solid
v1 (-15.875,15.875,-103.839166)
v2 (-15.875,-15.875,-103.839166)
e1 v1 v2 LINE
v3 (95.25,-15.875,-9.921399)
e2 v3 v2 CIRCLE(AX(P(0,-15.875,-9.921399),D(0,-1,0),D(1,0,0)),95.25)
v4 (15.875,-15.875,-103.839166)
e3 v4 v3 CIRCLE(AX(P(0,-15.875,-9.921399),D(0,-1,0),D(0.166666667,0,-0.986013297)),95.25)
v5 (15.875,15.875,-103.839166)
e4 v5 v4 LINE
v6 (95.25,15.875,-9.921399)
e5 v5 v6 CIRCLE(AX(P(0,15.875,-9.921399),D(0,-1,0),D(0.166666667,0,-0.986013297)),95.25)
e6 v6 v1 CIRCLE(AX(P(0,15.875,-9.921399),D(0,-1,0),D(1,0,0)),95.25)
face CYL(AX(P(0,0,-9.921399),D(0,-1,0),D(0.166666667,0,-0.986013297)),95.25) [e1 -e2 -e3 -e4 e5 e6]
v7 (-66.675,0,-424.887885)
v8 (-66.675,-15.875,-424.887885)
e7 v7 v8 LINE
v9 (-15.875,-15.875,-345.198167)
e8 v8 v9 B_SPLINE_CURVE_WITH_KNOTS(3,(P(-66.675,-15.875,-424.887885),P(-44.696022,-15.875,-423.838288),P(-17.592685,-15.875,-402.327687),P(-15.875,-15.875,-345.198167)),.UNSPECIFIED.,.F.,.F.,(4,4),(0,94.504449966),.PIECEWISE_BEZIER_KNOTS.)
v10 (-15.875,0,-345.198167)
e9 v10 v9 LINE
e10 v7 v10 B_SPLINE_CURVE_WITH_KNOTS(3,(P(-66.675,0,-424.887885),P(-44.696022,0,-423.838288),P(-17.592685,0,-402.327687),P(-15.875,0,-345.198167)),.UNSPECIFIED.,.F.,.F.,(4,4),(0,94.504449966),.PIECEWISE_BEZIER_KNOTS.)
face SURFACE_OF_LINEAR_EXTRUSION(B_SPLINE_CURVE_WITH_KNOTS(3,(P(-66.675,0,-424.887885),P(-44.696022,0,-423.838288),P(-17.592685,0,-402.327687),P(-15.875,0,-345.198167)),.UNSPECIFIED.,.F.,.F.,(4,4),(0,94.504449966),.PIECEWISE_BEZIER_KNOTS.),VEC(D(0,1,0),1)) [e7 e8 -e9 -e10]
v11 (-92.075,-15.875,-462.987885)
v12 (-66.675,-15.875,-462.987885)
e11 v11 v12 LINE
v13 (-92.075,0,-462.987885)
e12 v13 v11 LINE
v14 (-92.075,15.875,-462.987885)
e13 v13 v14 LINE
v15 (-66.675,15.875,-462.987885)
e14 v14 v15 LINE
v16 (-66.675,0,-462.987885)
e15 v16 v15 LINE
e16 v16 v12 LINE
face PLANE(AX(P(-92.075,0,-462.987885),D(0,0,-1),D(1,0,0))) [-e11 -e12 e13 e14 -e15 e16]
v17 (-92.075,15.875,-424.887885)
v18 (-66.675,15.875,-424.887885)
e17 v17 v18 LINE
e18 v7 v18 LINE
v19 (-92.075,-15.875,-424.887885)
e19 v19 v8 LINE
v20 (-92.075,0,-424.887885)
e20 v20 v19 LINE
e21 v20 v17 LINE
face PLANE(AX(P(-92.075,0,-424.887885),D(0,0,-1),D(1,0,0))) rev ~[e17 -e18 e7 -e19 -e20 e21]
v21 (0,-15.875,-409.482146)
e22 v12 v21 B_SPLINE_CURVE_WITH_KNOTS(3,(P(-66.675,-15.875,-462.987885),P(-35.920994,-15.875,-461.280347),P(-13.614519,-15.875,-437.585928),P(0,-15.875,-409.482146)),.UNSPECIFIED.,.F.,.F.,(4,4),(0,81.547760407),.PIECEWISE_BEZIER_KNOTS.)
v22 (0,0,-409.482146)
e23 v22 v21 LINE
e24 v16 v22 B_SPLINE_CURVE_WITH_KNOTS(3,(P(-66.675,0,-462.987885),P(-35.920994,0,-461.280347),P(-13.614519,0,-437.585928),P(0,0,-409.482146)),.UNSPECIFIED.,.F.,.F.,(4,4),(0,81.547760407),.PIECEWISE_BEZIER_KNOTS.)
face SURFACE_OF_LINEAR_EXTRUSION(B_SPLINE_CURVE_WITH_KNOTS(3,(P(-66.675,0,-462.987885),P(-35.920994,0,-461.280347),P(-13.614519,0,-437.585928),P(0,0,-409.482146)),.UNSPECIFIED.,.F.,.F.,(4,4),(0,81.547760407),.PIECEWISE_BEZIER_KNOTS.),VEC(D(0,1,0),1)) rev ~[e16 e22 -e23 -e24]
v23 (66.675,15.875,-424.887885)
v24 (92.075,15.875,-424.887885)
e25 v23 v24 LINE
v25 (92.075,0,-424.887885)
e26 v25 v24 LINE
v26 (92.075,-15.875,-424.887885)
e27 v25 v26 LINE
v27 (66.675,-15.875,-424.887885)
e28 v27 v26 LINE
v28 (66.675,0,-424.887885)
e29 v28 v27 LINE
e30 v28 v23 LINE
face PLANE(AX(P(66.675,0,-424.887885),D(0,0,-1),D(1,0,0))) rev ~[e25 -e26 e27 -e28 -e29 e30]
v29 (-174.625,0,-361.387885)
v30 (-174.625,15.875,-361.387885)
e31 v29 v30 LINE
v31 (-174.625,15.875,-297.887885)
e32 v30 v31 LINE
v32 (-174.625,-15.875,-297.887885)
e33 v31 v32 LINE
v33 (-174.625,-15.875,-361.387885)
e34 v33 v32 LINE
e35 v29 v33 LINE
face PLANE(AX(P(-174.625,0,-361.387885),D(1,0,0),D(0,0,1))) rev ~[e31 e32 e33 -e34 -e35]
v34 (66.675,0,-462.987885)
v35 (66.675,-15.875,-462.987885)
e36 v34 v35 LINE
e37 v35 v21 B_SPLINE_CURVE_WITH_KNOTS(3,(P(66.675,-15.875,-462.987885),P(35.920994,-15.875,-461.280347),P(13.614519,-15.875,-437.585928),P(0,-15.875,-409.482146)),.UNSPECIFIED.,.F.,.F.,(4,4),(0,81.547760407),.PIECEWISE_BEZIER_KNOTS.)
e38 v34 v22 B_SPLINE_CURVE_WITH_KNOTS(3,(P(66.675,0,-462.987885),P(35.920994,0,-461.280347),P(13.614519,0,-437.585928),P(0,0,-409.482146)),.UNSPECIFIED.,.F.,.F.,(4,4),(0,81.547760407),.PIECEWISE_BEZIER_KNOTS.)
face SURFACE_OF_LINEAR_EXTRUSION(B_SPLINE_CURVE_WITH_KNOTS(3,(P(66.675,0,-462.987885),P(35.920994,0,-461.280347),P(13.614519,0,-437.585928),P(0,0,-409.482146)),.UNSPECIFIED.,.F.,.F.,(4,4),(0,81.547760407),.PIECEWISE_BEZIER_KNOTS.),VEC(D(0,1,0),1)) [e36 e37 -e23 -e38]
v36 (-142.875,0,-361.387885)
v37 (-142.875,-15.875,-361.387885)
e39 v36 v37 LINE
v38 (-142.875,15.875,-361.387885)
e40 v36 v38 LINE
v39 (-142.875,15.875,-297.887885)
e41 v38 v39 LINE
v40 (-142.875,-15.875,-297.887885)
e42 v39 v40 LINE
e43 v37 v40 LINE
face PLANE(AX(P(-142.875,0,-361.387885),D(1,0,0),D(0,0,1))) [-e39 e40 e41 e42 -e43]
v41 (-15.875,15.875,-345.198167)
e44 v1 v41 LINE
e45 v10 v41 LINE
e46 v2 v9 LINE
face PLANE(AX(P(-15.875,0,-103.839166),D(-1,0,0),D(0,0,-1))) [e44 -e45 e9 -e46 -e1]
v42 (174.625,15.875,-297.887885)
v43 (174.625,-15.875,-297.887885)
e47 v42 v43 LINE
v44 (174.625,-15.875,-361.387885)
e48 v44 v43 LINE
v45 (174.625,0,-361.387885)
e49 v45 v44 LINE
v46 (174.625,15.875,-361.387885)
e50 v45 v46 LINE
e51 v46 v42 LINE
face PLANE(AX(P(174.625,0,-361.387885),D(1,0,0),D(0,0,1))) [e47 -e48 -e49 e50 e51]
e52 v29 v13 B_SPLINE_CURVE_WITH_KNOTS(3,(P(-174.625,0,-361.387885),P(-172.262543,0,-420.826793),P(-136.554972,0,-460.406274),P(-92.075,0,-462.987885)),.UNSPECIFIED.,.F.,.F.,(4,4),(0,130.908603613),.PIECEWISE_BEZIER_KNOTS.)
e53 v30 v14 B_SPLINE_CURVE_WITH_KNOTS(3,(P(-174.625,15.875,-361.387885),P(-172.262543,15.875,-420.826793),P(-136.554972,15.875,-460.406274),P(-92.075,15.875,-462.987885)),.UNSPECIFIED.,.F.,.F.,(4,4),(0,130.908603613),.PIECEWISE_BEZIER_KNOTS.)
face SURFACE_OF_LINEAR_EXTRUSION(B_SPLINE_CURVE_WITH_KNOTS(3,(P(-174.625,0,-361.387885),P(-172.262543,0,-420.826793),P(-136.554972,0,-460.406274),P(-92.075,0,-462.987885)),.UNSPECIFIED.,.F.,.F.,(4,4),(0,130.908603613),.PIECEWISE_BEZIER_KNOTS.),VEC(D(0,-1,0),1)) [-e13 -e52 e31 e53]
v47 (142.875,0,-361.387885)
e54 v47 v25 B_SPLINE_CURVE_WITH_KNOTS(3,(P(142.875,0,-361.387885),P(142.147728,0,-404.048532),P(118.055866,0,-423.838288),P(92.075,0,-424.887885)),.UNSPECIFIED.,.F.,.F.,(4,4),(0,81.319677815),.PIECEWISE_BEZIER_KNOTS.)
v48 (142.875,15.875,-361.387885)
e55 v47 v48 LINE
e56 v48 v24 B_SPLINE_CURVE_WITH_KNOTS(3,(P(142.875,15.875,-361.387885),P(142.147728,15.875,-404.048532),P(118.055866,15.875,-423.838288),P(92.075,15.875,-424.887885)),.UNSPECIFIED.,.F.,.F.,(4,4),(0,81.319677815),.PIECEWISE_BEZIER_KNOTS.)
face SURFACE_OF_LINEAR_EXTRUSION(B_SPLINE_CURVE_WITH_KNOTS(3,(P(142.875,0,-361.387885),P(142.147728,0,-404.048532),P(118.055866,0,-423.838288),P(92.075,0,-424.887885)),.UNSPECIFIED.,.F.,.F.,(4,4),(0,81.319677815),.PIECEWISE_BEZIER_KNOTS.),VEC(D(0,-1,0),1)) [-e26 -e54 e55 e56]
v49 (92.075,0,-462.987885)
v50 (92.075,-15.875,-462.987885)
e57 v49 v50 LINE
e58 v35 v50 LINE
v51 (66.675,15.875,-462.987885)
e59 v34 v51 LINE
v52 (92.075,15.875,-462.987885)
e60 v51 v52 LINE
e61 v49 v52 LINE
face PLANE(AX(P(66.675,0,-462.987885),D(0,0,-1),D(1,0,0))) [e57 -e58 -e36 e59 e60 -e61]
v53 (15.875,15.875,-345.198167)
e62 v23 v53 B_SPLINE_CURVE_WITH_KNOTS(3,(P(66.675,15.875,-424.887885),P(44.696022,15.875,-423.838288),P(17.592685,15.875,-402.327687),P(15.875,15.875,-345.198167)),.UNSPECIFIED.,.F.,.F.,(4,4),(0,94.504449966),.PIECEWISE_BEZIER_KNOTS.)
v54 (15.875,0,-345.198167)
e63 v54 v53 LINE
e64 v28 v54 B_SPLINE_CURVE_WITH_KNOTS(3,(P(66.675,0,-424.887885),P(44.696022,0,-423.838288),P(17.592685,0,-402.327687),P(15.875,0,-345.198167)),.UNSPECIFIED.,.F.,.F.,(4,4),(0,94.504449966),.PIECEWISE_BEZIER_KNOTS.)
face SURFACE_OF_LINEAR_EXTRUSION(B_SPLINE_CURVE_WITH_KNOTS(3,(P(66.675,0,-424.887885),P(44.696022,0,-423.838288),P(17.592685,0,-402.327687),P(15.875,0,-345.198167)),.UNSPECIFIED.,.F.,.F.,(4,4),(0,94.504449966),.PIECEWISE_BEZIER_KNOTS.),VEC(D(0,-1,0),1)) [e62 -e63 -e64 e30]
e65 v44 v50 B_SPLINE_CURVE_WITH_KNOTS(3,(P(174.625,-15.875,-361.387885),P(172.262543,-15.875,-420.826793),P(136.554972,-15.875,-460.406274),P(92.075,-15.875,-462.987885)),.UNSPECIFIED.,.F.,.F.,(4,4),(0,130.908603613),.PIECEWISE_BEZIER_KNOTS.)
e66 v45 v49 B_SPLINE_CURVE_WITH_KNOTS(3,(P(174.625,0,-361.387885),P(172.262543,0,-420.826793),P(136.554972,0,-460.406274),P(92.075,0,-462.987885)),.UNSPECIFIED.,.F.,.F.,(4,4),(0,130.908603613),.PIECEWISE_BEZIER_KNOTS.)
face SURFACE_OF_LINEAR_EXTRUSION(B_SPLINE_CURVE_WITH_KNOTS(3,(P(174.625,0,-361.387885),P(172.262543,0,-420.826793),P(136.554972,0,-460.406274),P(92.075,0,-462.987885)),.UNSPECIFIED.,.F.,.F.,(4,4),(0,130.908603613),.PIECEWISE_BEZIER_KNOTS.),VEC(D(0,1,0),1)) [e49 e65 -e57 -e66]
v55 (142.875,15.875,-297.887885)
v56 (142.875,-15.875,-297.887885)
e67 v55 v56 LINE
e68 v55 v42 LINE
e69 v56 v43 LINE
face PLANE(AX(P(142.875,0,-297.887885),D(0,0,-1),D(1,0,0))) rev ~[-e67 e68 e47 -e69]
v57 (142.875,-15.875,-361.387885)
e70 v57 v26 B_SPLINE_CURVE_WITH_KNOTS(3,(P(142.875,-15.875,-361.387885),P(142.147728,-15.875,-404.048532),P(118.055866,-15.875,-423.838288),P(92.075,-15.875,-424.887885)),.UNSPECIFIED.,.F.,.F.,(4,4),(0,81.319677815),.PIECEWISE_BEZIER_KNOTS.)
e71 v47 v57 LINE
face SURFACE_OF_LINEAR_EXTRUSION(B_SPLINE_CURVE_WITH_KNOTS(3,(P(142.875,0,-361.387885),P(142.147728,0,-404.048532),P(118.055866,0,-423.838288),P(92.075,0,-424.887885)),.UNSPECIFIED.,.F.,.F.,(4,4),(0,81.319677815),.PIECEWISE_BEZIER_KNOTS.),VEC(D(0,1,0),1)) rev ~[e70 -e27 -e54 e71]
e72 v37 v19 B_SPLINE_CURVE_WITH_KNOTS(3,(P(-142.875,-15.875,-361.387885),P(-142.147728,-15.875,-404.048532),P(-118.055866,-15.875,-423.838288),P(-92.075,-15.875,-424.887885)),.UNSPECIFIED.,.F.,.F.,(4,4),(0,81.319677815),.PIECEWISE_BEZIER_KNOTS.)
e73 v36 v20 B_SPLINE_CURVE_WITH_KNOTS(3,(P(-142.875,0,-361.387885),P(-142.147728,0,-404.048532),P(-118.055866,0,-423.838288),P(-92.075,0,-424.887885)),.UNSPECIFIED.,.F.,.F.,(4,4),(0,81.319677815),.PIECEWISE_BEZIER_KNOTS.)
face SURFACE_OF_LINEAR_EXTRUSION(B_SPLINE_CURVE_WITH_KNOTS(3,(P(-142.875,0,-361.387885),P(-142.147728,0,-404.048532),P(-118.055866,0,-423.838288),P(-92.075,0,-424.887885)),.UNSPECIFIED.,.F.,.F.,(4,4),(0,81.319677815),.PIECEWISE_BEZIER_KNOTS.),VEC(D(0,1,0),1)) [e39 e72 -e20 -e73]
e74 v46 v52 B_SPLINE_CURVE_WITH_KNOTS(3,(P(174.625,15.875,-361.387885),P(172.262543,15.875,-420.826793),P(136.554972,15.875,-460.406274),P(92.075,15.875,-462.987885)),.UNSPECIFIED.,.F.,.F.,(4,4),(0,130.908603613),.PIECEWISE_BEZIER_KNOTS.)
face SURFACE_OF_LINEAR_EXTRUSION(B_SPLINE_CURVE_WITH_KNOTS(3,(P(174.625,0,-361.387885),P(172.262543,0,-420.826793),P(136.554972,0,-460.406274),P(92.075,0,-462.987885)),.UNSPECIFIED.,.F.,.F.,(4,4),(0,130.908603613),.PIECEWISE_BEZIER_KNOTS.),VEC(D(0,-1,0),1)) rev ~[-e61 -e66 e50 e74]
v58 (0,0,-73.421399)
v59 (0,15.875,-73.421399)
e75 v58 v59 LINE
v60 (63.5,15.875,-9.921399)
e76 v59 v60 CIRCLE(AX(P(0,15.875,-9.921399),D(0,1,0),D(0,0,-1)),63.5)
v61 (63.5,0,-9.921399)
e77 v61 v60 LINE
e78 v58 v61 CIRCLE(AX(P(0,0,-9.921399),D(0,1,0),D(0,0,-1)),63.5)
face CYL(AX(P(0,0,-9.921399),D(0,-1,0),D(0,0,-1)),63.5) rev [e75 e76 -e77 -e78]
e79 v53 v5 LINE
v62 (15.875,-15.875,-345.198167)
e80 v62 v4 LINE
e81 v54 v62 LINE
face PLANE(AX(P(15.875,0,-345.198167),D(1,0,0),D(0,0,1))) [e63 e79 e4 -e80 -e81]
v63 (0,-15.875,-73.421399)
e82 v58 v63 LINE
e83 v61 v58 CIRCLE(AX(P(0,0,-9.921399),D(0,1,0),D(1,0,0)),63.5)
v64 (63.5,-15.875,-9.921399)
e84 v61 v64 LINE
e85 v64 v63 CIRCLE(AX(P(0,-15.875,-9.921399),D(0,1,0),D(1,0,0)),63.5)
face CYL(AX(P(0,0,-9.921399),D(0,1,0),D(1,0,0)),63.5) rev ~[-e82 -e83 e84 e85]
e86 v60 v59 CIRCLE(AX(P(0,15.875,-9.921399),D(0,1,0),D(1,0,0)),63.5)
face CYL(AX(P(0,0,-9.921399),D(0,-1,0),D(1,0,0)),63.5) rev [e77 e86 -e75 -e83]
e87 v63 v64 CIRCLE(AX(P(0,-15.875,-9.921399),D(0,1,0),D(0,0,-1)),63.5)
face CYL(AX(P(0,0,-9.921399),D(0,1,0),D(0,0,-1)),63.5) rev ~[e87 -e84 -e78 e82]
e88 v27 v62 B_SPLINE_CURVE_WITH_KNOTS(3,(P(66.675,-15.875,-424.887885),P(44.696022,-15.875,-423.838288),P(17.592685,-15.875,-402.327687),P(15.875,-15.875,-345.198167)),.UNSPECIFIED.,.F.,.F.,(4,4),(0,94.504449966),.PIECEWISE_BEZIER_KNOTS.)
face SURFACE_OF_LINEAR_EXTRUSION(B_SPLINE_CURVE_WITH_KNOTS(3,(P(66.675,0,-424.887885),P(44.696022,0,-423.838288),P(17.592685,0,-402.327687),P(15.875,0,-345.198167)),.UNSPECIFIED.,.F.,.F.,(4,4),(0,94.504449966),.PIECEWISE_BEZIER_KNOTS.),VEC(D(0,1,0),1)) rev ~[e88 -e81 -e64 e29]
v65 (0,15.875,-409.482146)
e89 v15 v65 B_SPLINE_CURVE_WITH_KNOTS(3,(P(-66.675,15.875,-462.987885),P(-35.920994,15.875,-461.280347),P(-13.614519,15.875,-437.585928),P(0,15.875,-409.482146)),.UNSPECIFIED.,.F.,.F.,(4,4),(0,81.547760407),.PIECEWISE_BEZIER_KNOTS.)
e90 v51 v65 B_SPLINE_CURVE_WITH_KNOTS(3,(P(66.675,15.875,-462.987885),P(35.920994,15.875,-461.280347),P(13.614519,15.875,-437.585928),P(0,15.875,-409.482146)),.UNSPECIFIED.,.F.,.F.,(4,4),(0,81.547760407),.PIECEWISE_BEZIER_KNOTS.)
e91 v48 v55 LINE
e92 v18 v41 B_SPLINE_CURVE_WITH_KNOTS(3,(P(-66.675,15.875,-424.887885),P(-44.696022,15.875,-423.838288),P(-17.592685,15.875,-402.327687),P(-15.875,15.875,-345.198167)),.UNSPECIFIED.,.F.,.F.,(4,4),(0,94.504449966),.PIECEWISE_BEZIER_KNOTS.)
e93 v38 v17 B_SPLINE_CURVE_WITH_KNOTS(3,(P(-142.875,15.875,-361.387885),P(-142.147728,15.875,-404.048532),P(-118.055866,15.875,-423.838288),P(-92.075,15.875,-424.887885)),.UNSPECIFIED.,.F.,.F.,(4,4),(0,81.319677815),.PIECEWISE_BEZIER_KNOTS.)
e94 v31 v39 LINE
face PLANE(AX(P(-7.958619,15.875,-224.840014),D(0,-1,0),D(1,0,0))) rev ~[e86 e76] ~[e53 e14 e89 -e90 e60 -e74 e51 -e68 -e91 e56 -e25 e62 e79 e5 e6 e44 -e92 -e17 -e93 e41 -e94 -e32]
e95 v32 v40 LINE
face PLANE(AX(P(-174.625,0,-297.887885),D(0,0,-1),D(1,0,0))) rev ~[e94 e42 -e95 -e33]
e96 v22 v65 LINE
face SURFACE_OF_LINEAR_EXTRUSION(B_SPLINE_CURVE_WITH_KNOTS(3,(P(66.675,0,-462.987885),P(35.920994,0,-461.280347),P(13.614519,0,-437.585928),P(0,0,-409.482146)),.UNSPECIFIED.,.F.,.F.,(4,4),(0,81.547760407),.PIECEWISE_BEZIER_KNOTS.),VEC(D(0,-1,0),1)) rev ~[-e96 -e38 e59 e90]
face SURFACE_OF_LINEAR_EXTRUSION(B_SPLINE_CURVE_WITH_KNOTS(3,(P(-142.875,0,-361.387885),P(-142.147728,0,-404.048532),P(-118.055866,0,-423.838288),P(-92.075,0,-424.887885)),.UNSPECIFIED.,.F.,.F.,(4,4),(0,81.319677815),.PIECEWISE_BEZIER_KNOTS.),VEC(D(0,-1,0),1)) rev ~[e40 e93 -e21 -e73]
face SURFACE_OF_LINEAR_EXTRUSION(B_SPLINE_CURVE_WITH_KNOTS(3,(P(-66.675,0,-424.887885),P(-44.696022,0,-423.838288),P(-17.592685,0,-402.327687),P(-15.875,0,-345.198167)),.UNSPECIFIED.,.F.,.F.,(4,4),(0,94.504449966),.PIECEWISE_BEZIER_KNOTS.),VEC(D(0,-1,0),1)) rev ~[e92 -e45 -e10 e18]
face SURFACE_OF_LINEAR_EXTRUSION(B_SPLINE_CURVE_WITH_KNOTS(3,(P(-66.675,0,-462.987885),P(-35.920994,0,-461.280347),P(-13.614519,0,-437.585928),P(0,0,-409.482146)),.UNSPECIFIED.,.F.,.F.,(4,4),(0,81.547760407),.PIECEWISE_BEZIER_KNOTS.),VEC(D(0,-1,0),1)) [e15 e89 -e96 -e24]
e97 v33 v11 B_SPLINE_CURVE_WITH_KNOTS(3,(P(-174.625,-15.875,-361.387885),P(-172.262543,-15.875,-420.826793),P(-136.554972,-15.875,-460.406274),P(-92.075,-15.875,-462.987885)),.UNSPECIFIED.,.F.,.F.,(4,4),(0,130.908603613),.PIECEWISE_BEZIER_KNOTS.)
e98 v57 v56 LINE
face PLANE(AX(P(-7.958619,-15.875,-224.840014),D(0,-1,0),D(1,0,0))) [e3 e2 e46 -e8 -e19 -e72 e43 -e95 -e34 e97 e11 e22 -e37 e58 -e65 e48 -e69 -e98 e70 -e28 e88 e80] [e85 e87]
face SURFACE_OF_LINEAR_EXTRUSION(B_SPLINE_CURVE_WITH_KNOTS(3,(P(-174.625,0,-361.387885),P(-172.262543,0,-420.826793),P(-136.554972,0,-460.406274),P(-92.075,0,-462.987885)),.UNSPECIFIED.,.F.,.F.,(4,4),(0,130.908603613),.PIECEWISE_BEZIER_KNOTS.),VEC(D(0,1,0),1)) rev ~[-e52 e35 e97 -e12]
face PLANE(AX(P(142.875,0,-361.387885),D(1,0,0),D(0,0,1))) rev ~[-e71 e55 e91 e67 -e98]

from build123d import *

# Parameters (mm, degrees)
F0_W     = 25.4
F0_H     = 38.1
F0_W_2   = 31.75
F0_H_2   = 63.5
F1_DEPTH = 15.875


with BuildPart() as f1:
    # F0 (on Front) → F1 (new body, symmetric)
    with BuildSketch(Plane.XZ):
        with BuildLine():
            Line((-15.875, -103.8391655019), (-15.875, -345.1981674205))
            Line((-15.875, -345.1981674205), (0, -345.1981674205))
            Line((0, -345.1981674205), (0, -105.1713989452))
            ThreePointArc((0, -105.1713989452), (-7.9654012916, -104.8377562407), (-15.875, -103.8391655019))
        make_face()
        with BuildLine():
            add(Edge.make_bspline(
                [(0, -409.482145582), (-10.3991862171, -388.0156164118), (-15.7271620535, -363.9765002128), (-15.875, -345.1981674205)],
                knots=[81.5477604067, 81.5477604067, 81.5477604067, 81.5477604067, 143.8364349915, 143.8364349915, 143.8364349915, 143.8364349915], degree=3))
            add(Edge.make_bspline(
                [(-66.675, -424.8878848455), (-44.6960218251, -423.8382875919), (-17.5926852971, -402.3276865482), (-15.875, -345.1981674205)],
                knots=[0, 0, 0, 0, 94.5044499655, 94.5044499655, 94.5044499655, 94.5044499655], degree=3))
            Line((-66.675, -424.8878848455), (-66.675, -462.9878848455))
            add(Edge.make_bspline(
                [(-66.675, -462.9878848455), (-35.9209941881, -461.2803468487), (-13.6145190391, -437.5859283193), (0, -409.482145582)],
                knots=[0, 0, 0, 0, 81.5477604067, 81.5477604067, 81.5477604067, 81.5477604067], degree=3))
        make_face()
        with BuildLine():
            Line((0, -345.1981674205), (-15.875, -345.1981674205))
            add(Edge.make_bspline(
                [(0, -409.482145582), (-10.3991862171, -388.0156164118), (-15.7271620535, -363.9765002128), (-15.875, -345.1981674205)],
                knots=[81.5477604067, 81.5477604067, 81.5477604067, 81.5477604067, 143.8364349915, 143.8364349915, 143.8364349915, 143.8364349915], degree=3))
            add(Edge.make_bspline(
                [(0, -409.482145582), (10.3991862171, -388.0156164118), (15.7271620535, -363.9765002128), (15.875, -345.1981674205)],
                knots=[81.5477604067, 81.5477604067, 81.5477604067, 81.5477604067, 143.8364349915, 143.8364349915, 143.8364349915, 143.8364349915], degree=3))
            Line((15.875, -345.1981674205), (0, -345.1981674205))
        make_face()
        with BuildLine():
            Line((0, -105.1713989452), (0, -345.1981674205))
            Line((0, -345.1981674205), (15.875, -345.1981674205))
            Line((15.875, -345.1981674205), (15.875, -103.8391655019))
            ThreePointArc((15.875, -103.8391655019), (7.9654012916, -104.8377562407), (0, -105.1713989452))
        make_face()
        with BuildLine():
            ThreePointArc((95.25, -9.9213989452), (-61.483610621, 62.8269902123), (-15.875, -103.8391655019))
            Line((-15.875, -103.8391655019), (-15.875, -91.1981674205))
            Line((-15.875, -91.1981674205), (0, -91.1981674205))
            Line((0, -91.1981674205), (15.875, -91.1981674205))
            Line((15.875, -91.1981674205), (15.875, -103.8391655019))
            ThreePointArc((15.875, -103.8391655019), (72.7483891574, -71.4050095662), (95.25, -9.9213989452))
        make_face()
        with BuildLine():
            ThreePointArc((63.5, -9.9213989452), (44.9012806053, -54.8226795505), (0, -73.4213989452))
            ThreePointArc((0, -73.4213989452), (-44.9012806053, 34.9798816602), (63.5, -9.9213989452))
        make_face(mode=Mode.SUBTRACT)
        with BuildLine():
            Line((-15.875, -91.1981674205), (-15.875, -103.8391655019))
            ThreePointArc((-15.875, -103.8391655019), (-7.9654012916, -104.8377562407), (0, -105.1713989452))
            Line((0, -105.1713989452), (0, -91.1981674205))
            Line((0, -91.1981674205), (-15.875, -91.1981674205))
        make_face()
        with Locations((-79.375, -443.9378848455)):
            Rectangle(F0_W, F0_H)
        with BuildLine():
            add(Edge.make_bspline(
                [(0, -409.482145582), (10.3991862171, -388.0156164118), (15.7271620535, -363.9765002128), (15.875, -345.1981674205)],
                knots=[81.5477604067, 81.5477604067, 81.5477604067, 81.5477604067, 143.8364349915, 143.8364349915, 143.8364349915, 143.8364349915], degree=3))
            add(Edge.make_bspline(
                [(66.675, -462.9878848455), (35.9209941881, -461.2803468487), (13.6145190391, -437.5859283193), (0, -409.482145582)],
                knots=[0, 0, 0, 0, 81.5477604067, 81.5477604067, 81.5477604067, 81.5477604067], degree=3))
            Line((66.675, -462.9878848455), (66.675, -424.8878848455))
            add(Edge.make_bspline(
                [(66.675, -424.8878848455), (44.6960218251, -423.8382875919), (17.5926852971, -402.3276865482), (15.875, -345.1981674205)],
                knots=[0, 0, 0, 0, 94.5044499655, 94.5044499655, 94.5044499655, 94.5044499655], degree=3))
        make_face()
        with BuildLine():
            Line((0, -91.1981674205), (0, -105.1713989452))
            ThreePointArc((0, -105.1713989452), (7.9654012916, -104.8377562407), (15.875, -103.8391655019))
            Line((15.875, -103.8391655019), (15.875, -91.1981674205))
            Line((15.875, -91.1981674205), (0, -91.1981674205))
        make_face()
        with BuildLine():
            Line((-92.075, -462.9878848455), (-92.075, -424.8878848455))
            add(Edge.make_bspline(
                [(-142.875, -361.3878848455), (-142.1477283955, -404.0485322475), (-118.0558662534, -423.8382875919), (-92.075, -424.8878848455)],
                knots=[0, 0, 0, 0, 81.3196778154, 81.3196778154, 81.3196778154, 81.3196778154], degree=3))
            Line((-142.875, -361.3878848455), (-174.625, -361.3878848455))
            add(Edge.make_bspline(
                [(-174.625, -361.3878848455), (-172.2625430346, -420.826792717), (-136.5549724221, -460.4062736034), (-92.075, -462.9878848455)],
                knots=[0, 0, 0, 0, 130.9086036134, 130.9086036134, 130.9086036134, 130.9086036134], degree=3))
        make_face()
        with Locations((79.375, -443.9378848455)):
            Rectangle(F0_W, F0_H)
        with Locations((-158.75, -329.6378848455)):
            Rectangle(F0_W_2, F0_H_2)
        with BuildLine():
            Line((92.075, -424.8878848455), (92.075, -462.9878848455))
            add(Edge.make_bspline(
                [(174.625, -361.3878848455), (172.2625430346, -420.826792717), (136.5549724221, -460.4062736034), (92.075, -462.9878848455)],
                knots=[0, 0, 0, 0, 130.9086036134, 130.9086036134, 130.9086036134, 130.9086036134], degree=3))
            Line((174.625, -361.3878848455), (142.875, -361.3878848455))
            add(Edge.make_bspline(
                [(142.875, -361.3878848455), (142.1477283955, -404.0485322475), (118.0558662534, -423.8382875919), (92.075, -424.8878848455)],
                knots=[0, 0, 0, 0, 81.3196778154, 81.3196778154, 81.3196778154, 81.3196778154], degree=3))
        make_face()
        with Locations((158.75, -329.6378848455)):
            Rectangle(F0_W_2, F0_H_2)
    extrude(amount=F1_DEPTH, both=True)


solid = f1.part
